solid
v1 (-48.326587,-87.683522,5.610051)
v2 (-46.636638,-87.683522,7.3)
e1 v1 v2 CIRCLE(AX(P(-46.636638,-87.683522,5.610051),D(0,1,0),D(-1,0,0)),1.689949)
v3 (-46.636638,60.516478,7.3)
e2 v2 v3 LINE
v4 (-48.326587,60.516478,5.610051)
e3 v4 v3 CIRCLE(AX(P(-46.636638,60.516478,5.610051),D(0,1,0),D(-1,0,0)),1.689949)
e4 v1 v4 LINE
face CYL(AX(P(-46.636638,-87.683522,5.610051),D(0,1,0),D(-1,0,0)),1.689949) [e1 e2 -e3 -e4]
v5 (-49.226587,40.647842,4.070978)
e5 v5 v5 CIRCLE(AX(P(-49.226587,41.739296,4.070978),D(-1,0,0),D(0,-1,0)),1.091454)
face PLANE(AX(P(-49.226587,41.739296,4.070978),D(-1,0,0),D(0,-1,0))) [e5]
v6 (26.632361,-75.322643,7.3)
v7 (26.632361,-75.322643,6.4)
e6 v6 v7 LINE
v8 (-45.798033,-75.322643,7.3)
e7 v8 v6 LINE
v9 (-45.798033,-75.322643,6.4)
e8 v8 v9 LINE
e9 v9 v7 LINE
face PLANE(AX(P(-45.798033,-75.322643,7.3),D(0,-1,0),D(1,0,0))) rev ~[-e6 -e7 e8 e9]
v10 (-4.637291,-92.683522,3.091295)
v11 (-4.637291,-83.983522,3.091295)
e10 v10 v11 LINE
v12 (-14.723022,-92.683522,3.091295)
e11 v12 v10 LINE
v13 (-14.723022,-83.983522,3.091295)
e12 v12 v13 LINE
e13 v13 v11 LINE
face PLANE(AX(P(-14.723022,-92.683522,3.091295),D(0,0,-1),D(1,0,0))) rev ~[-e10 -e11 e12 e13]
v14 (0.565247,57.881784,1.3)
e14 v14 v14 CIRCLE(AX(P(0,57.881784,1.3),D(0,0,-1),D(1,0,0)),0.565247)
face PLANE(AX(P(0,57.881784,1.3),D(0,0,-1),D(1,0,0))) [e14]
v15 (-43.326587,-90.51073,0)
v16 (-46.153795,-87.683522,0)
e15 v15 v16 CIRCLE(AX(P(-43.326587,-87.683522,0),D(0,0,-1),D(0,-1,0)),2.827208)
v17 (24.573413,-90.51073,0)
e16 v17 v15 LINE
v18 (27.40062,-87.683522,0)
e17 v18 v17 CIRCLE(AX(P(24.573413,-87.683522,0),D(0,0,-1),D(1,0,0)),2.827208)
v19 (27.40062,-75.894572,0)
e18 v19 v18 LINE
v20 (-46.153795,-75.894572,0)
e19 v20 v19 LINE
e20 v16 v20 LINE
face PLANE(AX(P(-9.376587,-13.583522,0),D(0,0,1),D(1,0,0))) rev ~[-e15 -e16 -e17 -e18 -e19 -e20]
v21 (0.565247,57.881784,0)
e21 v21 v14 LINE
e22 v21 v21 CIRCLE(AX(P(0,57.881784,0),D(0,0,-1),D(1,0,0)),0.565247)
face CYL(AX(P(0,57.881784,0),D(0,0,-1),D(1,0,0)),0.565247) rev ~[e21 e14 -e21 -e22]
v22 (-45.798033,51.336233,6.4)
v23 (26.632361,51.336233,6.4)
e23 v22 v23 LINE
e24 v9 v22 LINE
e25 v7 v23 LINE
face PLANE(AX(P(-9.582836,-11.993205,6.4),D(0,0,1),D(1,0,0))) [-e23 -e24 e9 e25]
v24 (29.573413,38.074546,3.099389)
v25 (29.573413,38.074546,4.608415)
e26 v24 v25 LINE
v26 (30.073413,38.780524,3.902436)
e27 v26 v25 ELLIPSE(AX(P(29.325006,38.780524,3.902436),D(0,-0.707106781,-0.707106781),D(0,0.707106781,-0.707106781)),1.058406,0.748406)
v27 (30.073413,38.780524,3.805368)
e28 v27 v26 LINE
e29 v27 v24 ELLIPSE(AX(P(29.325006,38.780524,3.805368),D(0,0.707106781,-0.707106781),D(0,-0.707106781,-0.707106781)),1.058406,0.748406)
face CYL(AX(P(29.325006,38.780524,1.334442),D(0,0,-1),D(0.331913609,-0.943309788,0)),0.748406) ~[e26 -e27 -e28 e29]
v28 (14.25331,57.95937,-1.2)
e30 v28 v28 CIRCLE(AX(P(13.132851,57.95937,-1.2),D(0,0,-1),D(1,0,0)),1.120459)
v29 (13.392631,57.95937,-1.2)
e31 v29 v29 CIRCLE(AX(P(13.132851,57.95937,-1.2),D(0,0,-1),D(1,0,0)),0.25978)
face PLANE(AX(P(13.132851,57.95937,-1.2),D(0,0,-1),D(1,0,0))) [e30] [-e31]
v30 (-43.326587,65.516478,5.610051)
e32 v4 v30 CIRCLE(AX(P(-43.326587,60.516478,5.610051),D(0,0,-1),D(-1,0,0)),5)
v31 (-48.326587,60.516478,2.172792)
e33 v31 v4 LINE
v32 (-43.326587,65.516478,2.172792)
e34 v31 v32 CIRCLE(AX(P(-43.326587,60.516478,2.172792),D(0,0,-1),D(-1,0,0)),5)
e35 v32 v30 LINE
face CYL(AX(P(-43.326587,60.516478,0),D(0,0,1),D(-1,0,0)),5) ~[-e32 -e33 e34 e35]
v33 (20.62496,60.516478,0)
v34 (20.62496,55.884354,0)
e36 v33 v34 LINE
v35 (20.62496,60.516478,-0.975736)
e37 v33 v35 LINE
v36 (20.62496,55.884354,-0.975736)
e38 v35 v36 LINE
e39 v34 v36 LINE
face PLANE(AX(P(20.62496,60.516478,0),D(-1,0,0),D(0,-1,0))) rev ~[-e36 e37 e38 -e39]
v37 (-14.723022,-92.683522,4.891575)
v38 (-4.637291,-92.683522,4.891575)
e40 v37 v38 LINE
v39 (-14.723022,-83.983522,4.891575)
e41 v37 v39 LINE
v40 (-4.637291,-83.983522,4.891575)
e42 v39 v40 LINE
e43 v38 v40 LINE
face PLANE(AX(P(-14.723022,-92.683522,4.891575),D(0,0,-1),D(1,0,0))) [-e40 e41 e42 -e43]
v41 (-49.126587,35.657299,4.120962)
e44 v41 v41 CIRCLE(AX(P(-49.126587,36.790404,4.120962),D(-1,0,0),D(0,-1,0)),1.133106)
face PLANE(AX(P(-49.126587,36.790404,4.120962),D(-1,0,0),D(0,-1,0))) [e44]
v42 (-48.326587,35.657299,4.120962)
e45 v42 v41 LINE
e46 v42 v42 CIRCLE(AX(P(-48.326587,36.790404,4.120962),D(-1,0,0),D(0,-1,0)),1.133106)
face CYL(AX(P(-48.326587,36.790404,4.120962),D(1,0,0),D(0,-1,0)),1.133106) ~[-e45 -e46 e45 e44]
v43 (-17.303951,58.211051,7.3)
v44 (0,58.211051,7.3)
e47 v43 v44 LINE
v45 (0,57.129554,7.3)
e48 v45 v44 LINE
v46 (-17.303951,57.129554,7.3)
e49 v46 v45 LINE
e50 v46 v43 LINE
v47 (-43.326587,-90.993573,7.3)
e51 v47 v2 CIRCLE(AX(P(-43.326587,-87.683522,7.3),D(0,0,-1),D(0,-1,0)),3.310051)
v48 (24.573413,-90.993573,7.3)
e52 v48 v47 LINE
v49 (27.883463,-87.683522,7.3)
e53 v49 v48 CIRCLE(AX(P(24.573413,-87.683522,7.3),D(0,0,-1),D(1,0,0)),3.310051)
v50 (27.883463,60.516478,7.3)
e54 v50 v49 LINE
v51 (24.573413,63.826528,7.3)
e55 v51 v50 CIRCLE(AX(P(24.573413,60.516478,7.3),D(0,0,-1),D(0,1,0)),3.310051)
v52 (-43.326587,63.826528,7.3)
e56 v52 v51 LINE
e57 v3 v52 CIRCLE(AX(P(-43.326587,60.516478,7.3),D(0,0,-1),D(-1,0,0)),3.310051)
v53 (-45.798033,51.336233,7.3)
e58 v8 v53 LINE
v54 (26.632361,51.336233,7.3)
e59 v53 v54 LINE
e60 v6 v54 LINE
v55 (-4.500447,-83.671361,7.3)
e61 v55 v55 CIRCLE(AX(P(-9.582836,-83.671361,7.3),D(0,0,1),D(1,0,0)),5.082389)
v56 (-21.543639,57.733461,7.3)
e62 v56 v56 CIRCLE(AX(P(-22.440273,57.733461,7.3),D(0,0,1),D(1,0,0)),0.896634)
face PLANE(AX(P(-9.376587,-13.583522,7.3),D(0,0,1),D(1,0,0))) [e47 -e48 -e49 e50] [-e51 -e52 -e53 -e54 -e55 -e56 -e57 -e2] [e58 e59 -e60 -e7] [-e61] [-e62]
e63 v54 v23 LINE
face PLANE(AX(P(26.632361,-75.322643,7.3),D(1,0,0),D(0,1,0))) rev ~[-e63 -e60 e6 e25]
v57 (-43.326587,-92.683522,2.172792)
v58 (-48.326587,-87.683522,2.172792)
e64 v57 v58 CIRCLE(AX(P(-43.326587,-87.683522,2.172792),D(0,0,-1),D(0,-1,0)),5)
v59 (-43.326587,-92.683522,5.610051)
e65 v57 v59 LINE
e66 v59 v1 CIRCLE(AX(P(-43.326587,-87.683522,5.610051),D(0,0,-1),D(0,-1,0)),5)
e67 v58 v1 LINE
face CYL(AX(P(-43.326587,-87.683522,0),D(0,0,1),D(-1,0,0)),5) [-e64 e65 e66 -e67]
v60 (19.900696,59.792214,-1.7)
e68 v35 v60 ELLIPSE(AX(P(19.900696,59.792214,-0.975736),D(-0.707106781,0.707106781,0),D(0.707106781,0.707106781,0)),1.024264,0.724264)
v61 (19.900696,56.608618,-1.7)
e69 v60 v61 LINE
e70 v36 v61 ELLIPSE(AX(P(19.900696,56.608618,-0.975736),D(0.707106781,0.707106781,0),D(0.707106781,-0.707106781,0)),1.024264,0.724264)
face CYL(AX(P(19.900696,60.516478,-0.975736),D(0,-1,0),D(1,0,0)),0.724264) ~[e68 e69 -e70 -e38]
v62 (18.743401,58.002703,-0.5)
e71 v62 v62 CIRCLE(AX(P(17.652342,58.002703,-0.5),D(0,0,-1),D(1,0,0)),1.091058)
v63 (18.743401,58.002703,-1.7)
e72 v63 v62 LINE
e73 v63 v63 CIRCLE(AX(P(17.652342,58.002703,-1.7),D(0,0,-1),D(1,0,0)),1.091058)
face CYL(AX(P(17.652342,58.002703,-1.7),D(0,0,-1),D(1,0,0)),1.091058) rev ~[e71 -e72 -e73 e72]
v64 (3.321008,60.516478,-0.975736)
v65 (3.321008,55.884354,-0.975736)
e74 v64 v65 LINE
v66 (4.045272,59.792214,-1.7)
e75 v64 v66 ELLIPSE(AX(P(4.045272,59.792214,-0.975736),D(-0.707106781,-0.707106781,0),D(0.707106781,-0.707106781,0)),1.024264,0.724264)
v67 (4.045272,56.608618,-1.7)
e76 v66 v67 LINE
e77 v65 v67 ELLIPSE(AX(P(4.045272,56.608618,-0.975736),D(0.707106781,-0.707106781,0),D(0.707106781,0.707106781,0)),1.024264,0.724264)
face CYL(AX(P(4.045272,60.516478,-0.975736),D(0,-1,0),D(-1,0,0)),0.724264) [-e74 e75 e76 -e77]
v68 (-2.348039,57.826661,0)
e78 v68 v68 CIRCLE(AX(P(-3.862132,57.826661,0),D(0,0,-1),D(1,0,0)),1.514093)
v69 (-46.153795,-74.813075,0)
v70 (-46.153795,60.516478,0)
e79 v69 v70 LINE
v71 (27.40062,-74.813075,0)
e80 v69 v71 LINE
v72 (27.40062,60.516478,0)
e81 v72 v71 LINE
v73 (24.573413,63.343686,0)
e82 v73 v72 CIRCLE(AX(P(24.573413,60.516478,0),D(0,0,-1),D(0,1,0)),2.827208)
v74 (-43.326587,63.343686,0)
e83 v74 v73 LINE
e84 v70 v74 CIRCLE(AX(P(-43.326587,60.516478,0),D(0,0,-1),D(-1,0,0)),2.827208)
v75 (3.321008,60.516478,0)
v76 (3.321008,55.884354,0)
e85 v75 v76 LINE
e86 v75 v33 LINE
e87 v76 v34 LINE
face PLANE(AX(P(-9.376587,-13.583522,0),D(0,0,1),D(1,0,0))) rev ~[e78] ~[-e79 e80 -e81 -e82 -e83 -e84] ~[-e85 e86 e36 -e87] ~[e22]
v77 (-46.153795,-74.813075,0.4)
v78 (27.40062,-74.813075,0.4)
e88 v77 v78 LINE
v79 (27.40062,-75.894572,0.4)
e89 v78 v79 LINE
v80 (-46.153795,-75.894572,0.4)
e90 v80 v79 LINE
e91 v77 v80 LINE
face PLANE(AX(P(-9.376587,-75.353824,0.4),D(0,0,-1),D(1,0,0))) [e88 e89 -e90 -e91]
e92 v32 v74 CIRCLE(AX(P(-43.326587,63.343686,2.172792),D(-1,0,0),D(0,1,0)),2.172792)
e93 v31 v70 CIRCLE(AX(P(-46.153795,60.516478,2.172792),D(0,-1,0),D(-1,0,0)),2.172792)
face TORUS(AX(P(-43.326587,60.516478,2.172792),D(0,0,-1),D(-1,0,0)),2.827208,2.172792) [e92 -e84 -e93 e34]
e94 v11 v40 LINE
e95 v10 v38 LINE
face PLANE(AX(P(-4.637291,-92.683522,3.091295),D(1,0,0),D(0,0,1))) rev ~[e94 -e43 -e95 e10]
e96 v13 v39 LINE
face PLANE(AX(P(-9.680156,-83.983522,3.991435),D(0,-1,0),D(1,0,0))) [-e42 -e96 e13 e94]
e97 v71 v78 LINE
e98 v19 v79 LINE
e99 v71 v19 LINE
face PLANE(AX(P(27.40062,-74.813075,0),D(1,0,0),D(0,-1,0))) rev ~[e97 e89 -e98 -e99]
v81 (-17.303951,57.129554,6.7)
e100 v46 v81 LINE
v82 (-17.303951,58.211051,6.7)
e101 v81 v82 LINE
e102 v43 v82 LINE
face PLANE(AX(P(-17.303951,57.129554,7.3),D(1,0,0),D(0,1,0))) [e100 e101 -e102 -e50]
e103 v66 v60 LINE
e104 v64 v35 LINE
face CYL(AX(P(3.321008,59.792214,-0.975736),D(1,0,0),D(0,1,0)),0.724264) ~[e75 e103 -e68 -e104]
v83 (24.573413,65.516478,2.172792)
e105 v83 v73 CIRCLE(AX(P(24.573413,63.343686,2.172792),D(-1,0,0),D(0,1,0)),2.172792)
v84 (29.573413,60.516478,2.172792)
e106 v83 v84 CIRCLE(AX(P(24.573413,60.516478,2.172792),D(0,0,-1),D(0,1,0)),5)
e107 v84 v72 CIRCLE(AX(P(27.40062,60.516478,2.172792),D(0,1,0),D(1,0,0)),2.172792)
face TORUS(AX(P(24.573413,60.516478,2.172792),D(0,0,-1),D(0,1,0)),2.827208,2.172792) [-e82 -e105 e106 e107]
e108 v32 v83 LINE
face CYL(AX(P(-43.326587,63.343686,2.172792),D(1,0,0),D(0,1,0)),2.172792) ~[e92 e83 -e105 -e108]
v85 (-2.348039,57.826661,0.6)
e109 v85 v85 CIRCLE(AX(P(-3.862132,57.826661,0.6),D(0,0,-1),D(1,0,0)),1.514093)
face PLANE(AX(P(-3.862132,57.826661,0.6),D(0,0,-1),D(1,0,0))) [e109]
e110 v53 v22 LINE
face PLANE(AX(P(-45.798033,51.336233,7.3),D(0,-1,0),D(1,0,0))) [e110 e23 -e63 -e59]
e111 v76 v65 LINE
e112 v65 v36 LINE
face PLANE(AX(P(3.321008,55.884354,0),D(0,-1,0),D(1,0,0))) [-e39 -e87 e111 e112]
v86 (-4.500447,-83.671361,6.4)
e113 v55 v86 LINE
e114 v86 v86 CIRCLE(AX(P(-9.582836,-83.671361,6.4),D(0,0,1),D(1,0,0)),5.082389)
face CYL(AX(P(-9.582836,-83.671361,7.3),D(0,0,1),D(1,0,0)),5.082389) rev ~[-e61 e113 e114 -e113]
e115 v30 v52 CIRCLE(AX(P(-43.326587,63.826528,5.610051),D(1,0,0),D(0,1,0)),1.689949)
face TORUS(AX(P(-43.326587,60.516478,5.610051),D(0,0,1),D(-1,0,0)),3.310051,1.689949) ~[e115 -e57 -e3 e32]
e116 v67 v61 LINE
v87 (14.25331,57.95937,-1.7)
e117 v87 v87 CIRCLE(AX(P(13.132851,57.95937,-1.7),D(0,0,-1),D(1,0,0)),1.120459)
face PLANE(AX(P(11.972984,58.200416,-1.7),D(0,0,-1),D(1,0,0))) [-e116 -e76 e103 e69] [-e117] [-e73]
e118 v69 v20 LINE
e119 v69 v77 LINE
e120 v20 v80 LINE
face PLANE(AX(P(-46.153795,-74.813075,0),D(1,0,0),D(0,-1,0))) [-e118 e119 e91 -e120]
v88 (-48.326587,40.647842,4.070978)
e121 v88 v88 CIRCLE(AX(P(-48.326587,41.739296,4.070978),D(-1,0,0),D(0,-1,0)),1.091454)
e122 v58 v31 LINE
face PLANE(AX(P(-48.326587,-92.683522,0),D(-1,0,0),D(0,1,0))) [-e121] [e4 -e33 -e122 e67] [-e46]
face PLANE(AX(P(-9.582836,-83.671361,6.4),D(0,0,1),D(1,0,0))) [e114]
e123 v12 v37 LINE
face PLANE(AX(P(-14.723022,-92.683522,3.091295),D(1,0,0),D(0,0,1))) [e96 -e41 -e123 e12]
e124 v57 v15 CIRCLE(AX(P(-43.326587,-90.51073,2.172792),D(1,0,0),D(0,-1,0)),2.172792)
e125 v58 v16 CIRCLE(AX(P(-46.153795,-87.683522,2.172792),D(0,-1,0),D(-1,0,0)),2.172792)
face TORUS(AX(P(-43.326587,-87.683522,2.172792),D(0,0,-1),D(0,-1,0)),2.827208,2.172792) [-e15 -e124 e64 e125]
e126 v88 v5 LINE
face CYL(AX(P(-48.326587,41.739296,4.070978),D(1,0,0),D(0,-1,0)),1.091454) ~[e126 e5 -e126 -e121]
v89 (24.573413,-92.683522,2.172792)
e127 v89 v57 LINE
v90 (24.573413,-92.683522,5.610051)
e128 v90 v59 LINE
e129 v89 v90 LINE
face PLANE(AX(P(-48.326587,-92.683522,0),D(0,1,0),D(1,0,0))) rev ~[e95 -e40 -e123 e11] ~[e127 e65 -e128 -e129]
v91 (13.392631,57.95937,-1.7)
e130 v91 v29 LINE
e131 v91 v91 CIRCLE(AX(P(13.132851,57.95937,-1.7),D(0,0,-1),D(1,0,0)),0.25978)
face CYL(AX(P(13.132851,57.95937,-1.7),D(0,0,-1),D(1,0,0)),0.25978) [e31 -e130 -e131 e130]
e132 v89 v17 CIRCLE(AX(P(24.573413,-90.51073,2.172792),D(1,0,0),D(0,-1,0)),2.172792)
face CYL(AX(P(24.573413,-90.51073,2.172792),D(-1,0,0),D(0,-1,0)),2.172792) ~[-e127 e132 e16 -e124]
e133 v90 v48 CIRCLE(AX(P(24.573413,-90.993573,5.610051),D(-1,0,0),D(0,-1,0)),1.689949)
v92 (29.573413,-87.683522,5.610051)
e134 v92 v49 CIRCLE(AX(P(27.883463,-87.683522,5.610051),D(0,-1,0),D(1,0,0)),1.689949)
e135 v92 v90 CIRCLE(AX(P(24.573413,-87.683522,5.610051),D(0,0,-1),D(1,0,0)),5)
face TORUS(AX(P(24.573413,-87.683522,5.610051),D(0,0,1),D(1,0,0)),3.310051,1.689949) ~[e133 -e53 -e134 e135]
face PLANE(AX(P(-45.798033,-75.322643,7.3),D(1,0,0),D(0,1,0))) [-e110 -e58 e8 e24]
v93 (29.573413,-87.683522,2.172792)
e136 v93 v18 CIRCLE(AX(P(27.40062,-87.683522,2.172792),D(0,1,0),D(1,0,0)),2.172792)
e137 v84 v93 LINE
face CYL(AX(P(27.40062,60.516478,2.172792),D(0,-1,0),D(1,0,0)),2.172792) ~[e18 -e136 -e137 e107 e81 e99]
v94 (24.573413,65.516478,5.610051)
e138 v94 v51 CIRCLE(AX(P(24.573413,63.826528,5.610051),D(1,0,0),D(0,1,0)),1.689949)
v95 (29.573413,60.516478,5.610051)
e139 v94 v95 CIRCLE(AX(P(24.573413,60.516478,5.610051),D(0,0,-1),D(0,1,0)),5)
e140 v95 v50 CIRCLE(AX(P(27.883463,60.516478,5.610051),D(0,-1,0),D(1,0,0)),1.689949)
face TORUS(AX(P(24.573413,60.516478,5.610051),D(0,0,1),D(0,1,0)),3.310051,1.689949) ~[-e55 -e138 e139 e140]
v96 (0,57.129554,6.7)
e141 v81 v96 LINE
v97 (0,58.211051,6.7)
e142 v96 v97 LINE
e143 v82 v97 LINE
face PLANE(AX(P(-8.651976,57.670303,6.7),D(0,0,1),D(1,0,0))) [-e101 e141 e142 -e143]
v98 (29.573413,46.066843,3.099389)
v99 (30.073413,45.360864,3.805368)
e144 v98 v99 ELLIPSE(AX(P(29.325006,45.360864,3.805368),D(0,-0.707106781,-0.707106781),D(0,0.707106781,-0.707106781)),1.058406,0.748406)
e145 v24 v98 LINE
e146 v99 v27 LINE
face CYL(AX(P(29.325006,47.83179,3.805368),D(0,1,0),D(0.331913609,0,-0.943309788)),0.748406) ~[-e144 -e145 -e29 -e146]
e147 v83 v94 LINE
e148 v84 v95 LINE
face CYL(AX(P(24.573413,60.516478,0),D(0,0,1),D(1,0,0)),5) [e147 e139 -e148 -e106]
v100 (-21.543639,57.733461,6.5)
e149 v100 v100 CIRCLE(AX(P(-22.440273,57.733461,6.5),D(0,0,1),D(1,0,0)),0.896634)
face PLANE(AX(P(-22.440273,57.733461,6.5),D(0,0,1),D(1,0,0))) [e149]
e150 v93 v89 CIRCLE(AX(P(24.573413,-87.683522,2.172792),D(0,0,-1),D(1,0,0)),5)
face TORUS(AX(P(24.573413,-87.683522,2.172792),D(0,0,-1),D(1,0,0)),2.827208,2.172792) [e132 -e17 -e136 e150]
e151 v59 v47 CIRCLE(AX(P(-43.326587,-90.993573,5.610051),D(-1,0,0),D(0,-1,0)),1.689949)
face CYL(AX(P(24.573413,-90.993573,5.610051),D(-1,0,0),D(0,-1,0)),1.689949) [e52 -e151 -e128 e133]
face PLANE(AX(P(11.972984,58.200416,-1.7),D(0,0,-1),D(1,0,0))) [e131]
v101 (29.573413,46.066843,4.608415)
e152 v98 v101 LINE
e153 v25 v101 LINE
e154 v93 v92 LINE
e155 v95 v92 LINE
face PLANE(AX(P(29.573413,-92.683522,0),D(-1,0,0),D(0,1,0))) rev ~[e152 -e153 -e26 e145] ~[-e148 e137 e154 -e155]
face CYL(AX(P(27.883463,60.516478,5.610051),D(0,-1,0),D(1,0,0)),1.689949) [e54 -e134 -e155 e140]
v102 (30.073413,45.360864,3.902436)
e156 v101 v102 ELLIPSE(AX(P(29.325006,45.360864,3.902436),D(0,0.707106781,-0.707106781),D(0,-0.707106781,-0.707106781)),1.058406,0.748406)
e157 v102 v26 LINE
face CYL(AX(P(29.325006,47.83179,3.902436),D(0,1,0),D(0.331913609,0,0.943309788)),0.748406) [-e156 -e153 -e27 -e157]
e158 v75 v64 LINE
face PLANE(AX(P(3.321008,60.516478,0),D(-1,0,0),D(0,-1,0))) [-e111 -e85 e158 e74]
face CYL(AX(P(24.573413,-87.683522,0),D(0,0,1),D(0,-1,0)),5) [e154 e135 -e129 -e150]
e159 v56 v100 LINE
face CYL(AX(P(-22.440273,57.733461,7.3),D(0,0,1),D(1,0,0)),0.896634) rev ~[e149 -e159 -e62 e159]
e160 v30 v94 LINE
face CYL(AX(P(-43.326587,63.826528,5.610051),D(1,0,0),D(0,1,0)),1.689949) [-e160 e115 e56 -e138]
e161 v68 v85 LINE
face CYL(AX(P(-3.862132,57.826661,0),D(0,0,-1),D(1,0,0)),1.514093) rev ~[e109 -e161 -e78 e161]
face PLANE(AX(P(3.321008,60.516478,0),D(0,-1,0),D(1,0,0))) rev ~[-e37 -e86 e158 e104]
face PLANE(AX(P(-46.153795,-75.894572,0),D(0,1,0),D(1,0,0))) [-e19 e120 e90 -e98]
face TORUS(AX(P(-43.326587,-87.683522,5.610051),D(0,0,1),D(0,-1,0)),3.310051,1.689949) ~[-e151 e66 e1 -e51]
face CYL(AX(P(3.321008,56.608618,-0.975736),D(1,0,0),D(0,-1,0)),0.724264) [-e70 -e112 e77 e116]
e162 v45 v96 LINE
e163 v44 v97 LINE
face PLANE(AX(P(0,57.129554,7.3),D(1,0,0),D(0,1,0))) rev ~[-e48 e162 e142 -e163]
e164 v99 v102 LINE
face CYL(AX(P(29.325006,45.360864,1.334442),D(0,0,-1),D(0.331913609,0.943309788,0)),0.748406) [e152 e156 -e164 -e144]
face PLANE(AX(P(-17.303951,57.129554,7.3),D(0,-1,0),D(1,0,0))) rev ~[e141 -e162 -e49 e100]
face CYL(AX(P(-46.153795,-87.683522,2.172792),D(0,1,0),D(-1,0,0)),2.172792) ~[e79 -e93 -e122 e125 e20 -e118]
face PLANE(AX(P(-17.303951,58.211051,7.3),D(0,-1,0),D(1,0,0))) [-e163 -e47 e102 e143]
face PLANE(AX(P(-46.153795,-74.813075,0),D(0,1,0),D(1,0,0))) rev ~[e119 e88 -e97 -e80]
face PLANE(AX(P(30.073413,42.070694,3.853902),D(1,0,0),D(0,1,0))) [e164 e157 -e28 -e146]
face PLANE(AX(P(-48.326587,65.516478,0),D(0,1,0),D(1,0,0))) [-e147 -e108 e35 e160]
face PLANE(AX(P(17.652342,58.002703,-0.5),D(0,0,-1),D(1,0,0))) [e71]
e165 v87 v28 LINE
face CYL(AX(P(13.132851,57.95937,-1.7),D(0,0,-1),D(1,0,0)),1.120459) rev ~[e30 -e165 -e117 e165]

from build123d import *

# Parameters (mm, degrees)
F0_W         = 77.9
F0_H         = 158.2
F1_DEPTH     = 7.3
F2_R         = 5
F3_R         = 1.6899494937
F4_R         = 2.1727922061
F5_W         = 72.4303945899
F5_H         = 126.6588754952
F6_DEPTH     = 0.9
F7_R         = 5.0823894813
F8_DEPTH     = 0.9
F9_W         = 17.3039510846
F9_H         = 1.0814964771
F10_DEPTH    = 0.6
F11_R        = 0.8966339166
F12_DEPTH    = 0.8
F13_W        = 17.3039520159
F13_H        = 4.6321238935
F14_DEPTH    = 1.7
F15_R        = 0.7242640687
F16_R        = 1.0910584654
F17_DEPTH    = 1.2
F18_R        = 1.1204591048
F18_R_2      = 0.2597799208
F19_DEPTH    = 0.5
F20_R        = 0.5652467708
F21_DEPTH    = 1.3
F22_R        = 1.5140930758
F23_DEPTH    = 0.6
F24_W        = 10.0857308134
F24_H        = 1.8002798315
F25_DEPTH    = 8.7
F26_W        = 7.992297411
F26_H        = 1.5090261586
F27_DEPTH    = 0.5
F28_T1_DEPTH = 5.0389206483
F28_T3_DEPTH = 11.5221919007
F29_R        = 1.0914541248
F30_DEPTH    = 0.9
F31_R        = 1.1331057204
F32_DEPTH    = 0.8
F33_W        = 73.5544155877
F33_H        = 1.0814964771
F34_DEPTH    = 0.4


# Not quite as in the source:
# - a fillet or chamfer that OpenCascade refuses, or shapes differently, is made with other operations: its cross-section is extruded or revolved along the edge and cut away or added


with BuildPart() as f1:
    # F0 (on Top) → F1 (new body)
    with BuildSketch(Plane.XY):
        with Locations((-9.3765874773, -13.58352229)):
            Rectangle(F0_W, F0_H)
    extrude(amount=F1_DEPTH)

    # F2
    f2_edges = [f1.edges().sort_by_distance(p)[0] for p in [
        (-48.326587, -92.683522, 3.65),
        (29.573413, -92.683522, 3.65),
        (29.573413, 65.516478, 3.65),
        (-48.326587, 65.516478, 3.65),
    ]]
    fillet(f2_edges, radius=F2_R)

    # F3
    f3_edges = [f1.edges().sort_by_distance(p)[0] for p in [
        (-48.326587, -13.583522, 7.3),
        (-9.376587, 65.516478, 7.3),
        (28.108946, 64.052012, 7.3),
        (-46.862121, 64.052012, 7.3),
        (29.573413, -13.583522, 7.3),
        (28.108946, -91.219056, 7.3),
        (-46.862121, -91.219056, 7.3),
        (-9.376587, -92.683522, 7.3),
    ]]
    fillet(f3_edges, radius=F3_R)

    # F4
    f4_edges = [f1.edges().sort_by_distance(p)[0] for p in [
        (-48.326587, -13.583522, 0),
        (-9.376587, 65.516478, 0),
        (28.108946, 64.052012, 0),
        (-46.862121, 64.052012, 0),
        (29.573413, -13.583522, 0),
        (28.108946, -91.219056, 0),
        (-46.862121, -91.219056, 0),
        (-9.376587, -92.683522, 0),
    ]]
    fillet(f4_edges, radius=F4_R)

    # F5 (on face) → F6 (cut)
    with BuildSketch(Plane.XY.offset(7.3)):
        with Locations((-9.5828361809, -11.9932051748)):
            Rectangle(F5_W, F5_H)
    extrude(amount=-F6_DEPTH, mode=Mode.SUBTRACT)

    # F7 (on face) → F8 (cut)
    with BuildSketch(Plane.XY.offset(7.3)):
        with Locations((-9.5828361809, -83.671361208)):
            Circle(F7_R)
    extrude(amount=-F8_DEPTH, mode=Mode.SUBTRACT)

    # F9 (on face) → F10 (cut)
    with BuildSketch(Plane.XY.offset(7.3)):
        with Locations((-8.6519755423, 57.6703026891)):
            Rectangle(F9_W, F9_H)
    extrude(amount=-F10_DEPTH, mode=Mode.SUBTRACT)

    # F11 (on face) → F12 (cut)
    with BuildSketch(Plane.XY.offset(7.3)):
        with Locations((-22.4402733147, 57.7334612608)):
            Circle(F11_R)
    extrude(amount=-F12_DEPTH, mode=Mode.SUBTRACT)

    # F13 (on face) → F14 (join)
    with BuildSketch(Plane(origin=(0, 0, 0), x_dir=(1, 0, 0), z_dir=(0, 0, -1))):
        with Locations((11.9729838334, -58.2004157633)):
            Rectangle(F13_W, F13_H)
    extrude(amount=F14_DEPTH)

    # F15
    f15_edges = [f1.edges().sort_by_distance(p)[0] for p in [
        (11.972984, 60.516478, -1.7),
        (11.972984, 55.884354, -1.7),
        (20.62496, 58.200416, -1.7),
        (3.321008, 58.200416, -1.7),
    ]]
    fillet(f15_edges, radius=F15_R)

    # F16 (on face) → F17 (cut)
    with BuildSketch(Plane(origin=(0, 0, -1.7), x_dir=(1, 0, 0), z_dir=(0, 0, -1))):
        with Locations((17.652342096, -58.0027028918)):
            Circle(F16_R)
    extrude(amount=-F17_DEPTH, mode=Mode.SUBTRACT)

    # F18 (on face) → F19 (cut)
    with BuildSketch(Plane(origin=(0, 0, -1.7), x_dir=(1, 0, 0), z_dir=(0, 0, -1))):
        with Locations((13.1328506395, -57.9593703151)):
            Circle(F18_R)
        with Locations((13.1328506395, -57.9593703151)):
            Circle(F18_R_2, mode=Mode.SUBTRACT)
    extrude(amount=-F19_DEPTH, mode=Mode.SUBTRACT)

    # F20 (on face) → F21 (cut)
    with BuildSketch(Plane(origin=(0, 0, 0), x_dir=(1, 0, 0), z_dir=(0, 0, -1))):
        with Locations((0, -57.881783694)):
            Circle(F20_R)
    extrude(amount=-F21_DEPTH, mode=Mode.SUBTRACT)

    # F22 (on face) → F23 (cut)
    with BuildSketch(Plane(origin=(0, 0, 0), x_dir=(1, 0, 0), z_dir=(0, 0, -1))):
        with Locations((-3.8621318527, -57.8266605735)):
            Circle(F22_R)
    extrude(amount=-F23_DEPTH, mode=Mode.SUBTRACT)

    # F24 (on face) → F25 (cut)
    with BuildSketch(Plane.XZ.offset(92.68352229)):
        with Locations((-9.6801561303, 3.9914349327)):
            Rectangle(F24_W, F24_H)
    extrude(amount=-F25_DEPTH, mode=Mode.SUBTRACT)

    # F26 (on face) → F27 (join)
    with BuildSketch(Plane.YZ.offset(29.5734125227)):
        with Locations((42.0706942677, 3.8539019879)):
            Rectangle(F26_W, F26_H)
    extrude(amount=F27_DEPTH)

    # F28: fillet of radius 0.7484062043 on 4 edges, made by hand

    # F28_s2 → F28_t1 (cut)
    with BuildSketch(Plane.XY.offset(1.3344416637)):
        with BuildLine():
            ThreePointArc((29.5734125227, 46.0668429732), (29.9357520066, 45.7934164433), (30.0734125227, 45.3608640753))
            Line((30.0734125227, 45.3608640753), (30.0734125227, 46.0668429732))
            Line((30.0734125227, 46.0668429732), (29.5734125227, 46.0668429732))
        make_face()
        with BuildLine():
            ThreePointArc((29.5734125227, 38.0745455623), (29.9357520066, 38.3479720922), (30.0734125227, 38.7805244602))
            Line((30.0734125227, 38.7805244602), (30.0734125227, 38.0745455623))
            Line((30.0734125227, 38.0745455623), (29.5734125227, 38.0745455623))
        make_face()
    extrude(amount=F28_T1_DEPTH, mode=Mode.SUBTRACT)

    # F28_s4 → F28_t3 (cut)
    with BuildSketch(Plane.XZ.offset(-47.8317902181)):
        with BuildLine():
            ThreePointArc((29.5734125227, 4.6084150672), (29.9357520066, 4.3349885373), (30.0734125227, 3.9024361693))
            Line((30.0734125227, 3.9024361693), (30.0734125227, 4.6084150672))
            Line((30.0734125227, 4.6084150672), (29.5734125227, 4.6084150672))
        make_face()
        with BuildLine():
            ThreePointArc((29.5734125227, 3.0993889086), (29.9357520066, 3.3728154385), (30.0734125227, 3.8053678065))
            Line((30.0734125227, 3.8053678065), (30.0734125227, 3.0993889086))
            Line((30.0734125227, 3.0993889086), (29.5734125227, 3.0993889086))
        make_face()
    extrude(amount=F28_T3_DEPTH, mode=Mode.SUBTRACT)

    # F29 (on face) → F30 (join)
    with BuildSketch(Plane(origin=(-48.3265874773, 0, 0), x_dir=(0, -1, 0), z_dir=(-1, 0, 0))):
        with Locations((-41.7392961681, 4.070978146)):
            Circle(F29_R)
    extrude(amount=F30_DEPTH)

    # F31 (on face) → F32 (join)
    with BuildSketch(Plane(origin=(-48.3265874773, 0, 0), x_dir=(0, -1, 0), z_dir=(-1, 0, 0))):
        with Locations((-36.7904044688, 4.1209622286)):
            Circle(F31_R)
    extrude(amount=F32_DEPTH)

    # F33 (on face) → F34 (cut)
    with BuildSketch(Plane(origin=(0, 0, 0), x_dir=(1, 0, 0), z_dir=(0, 0, -1))):
        with Locations((-9.3765874773, 75.3538236022)):
            Rectangle(F33_W, F33_H)
    extrude(amount=-F34_DEPTH, mode=Mode.SUBTRACT)


solid = f1.part
